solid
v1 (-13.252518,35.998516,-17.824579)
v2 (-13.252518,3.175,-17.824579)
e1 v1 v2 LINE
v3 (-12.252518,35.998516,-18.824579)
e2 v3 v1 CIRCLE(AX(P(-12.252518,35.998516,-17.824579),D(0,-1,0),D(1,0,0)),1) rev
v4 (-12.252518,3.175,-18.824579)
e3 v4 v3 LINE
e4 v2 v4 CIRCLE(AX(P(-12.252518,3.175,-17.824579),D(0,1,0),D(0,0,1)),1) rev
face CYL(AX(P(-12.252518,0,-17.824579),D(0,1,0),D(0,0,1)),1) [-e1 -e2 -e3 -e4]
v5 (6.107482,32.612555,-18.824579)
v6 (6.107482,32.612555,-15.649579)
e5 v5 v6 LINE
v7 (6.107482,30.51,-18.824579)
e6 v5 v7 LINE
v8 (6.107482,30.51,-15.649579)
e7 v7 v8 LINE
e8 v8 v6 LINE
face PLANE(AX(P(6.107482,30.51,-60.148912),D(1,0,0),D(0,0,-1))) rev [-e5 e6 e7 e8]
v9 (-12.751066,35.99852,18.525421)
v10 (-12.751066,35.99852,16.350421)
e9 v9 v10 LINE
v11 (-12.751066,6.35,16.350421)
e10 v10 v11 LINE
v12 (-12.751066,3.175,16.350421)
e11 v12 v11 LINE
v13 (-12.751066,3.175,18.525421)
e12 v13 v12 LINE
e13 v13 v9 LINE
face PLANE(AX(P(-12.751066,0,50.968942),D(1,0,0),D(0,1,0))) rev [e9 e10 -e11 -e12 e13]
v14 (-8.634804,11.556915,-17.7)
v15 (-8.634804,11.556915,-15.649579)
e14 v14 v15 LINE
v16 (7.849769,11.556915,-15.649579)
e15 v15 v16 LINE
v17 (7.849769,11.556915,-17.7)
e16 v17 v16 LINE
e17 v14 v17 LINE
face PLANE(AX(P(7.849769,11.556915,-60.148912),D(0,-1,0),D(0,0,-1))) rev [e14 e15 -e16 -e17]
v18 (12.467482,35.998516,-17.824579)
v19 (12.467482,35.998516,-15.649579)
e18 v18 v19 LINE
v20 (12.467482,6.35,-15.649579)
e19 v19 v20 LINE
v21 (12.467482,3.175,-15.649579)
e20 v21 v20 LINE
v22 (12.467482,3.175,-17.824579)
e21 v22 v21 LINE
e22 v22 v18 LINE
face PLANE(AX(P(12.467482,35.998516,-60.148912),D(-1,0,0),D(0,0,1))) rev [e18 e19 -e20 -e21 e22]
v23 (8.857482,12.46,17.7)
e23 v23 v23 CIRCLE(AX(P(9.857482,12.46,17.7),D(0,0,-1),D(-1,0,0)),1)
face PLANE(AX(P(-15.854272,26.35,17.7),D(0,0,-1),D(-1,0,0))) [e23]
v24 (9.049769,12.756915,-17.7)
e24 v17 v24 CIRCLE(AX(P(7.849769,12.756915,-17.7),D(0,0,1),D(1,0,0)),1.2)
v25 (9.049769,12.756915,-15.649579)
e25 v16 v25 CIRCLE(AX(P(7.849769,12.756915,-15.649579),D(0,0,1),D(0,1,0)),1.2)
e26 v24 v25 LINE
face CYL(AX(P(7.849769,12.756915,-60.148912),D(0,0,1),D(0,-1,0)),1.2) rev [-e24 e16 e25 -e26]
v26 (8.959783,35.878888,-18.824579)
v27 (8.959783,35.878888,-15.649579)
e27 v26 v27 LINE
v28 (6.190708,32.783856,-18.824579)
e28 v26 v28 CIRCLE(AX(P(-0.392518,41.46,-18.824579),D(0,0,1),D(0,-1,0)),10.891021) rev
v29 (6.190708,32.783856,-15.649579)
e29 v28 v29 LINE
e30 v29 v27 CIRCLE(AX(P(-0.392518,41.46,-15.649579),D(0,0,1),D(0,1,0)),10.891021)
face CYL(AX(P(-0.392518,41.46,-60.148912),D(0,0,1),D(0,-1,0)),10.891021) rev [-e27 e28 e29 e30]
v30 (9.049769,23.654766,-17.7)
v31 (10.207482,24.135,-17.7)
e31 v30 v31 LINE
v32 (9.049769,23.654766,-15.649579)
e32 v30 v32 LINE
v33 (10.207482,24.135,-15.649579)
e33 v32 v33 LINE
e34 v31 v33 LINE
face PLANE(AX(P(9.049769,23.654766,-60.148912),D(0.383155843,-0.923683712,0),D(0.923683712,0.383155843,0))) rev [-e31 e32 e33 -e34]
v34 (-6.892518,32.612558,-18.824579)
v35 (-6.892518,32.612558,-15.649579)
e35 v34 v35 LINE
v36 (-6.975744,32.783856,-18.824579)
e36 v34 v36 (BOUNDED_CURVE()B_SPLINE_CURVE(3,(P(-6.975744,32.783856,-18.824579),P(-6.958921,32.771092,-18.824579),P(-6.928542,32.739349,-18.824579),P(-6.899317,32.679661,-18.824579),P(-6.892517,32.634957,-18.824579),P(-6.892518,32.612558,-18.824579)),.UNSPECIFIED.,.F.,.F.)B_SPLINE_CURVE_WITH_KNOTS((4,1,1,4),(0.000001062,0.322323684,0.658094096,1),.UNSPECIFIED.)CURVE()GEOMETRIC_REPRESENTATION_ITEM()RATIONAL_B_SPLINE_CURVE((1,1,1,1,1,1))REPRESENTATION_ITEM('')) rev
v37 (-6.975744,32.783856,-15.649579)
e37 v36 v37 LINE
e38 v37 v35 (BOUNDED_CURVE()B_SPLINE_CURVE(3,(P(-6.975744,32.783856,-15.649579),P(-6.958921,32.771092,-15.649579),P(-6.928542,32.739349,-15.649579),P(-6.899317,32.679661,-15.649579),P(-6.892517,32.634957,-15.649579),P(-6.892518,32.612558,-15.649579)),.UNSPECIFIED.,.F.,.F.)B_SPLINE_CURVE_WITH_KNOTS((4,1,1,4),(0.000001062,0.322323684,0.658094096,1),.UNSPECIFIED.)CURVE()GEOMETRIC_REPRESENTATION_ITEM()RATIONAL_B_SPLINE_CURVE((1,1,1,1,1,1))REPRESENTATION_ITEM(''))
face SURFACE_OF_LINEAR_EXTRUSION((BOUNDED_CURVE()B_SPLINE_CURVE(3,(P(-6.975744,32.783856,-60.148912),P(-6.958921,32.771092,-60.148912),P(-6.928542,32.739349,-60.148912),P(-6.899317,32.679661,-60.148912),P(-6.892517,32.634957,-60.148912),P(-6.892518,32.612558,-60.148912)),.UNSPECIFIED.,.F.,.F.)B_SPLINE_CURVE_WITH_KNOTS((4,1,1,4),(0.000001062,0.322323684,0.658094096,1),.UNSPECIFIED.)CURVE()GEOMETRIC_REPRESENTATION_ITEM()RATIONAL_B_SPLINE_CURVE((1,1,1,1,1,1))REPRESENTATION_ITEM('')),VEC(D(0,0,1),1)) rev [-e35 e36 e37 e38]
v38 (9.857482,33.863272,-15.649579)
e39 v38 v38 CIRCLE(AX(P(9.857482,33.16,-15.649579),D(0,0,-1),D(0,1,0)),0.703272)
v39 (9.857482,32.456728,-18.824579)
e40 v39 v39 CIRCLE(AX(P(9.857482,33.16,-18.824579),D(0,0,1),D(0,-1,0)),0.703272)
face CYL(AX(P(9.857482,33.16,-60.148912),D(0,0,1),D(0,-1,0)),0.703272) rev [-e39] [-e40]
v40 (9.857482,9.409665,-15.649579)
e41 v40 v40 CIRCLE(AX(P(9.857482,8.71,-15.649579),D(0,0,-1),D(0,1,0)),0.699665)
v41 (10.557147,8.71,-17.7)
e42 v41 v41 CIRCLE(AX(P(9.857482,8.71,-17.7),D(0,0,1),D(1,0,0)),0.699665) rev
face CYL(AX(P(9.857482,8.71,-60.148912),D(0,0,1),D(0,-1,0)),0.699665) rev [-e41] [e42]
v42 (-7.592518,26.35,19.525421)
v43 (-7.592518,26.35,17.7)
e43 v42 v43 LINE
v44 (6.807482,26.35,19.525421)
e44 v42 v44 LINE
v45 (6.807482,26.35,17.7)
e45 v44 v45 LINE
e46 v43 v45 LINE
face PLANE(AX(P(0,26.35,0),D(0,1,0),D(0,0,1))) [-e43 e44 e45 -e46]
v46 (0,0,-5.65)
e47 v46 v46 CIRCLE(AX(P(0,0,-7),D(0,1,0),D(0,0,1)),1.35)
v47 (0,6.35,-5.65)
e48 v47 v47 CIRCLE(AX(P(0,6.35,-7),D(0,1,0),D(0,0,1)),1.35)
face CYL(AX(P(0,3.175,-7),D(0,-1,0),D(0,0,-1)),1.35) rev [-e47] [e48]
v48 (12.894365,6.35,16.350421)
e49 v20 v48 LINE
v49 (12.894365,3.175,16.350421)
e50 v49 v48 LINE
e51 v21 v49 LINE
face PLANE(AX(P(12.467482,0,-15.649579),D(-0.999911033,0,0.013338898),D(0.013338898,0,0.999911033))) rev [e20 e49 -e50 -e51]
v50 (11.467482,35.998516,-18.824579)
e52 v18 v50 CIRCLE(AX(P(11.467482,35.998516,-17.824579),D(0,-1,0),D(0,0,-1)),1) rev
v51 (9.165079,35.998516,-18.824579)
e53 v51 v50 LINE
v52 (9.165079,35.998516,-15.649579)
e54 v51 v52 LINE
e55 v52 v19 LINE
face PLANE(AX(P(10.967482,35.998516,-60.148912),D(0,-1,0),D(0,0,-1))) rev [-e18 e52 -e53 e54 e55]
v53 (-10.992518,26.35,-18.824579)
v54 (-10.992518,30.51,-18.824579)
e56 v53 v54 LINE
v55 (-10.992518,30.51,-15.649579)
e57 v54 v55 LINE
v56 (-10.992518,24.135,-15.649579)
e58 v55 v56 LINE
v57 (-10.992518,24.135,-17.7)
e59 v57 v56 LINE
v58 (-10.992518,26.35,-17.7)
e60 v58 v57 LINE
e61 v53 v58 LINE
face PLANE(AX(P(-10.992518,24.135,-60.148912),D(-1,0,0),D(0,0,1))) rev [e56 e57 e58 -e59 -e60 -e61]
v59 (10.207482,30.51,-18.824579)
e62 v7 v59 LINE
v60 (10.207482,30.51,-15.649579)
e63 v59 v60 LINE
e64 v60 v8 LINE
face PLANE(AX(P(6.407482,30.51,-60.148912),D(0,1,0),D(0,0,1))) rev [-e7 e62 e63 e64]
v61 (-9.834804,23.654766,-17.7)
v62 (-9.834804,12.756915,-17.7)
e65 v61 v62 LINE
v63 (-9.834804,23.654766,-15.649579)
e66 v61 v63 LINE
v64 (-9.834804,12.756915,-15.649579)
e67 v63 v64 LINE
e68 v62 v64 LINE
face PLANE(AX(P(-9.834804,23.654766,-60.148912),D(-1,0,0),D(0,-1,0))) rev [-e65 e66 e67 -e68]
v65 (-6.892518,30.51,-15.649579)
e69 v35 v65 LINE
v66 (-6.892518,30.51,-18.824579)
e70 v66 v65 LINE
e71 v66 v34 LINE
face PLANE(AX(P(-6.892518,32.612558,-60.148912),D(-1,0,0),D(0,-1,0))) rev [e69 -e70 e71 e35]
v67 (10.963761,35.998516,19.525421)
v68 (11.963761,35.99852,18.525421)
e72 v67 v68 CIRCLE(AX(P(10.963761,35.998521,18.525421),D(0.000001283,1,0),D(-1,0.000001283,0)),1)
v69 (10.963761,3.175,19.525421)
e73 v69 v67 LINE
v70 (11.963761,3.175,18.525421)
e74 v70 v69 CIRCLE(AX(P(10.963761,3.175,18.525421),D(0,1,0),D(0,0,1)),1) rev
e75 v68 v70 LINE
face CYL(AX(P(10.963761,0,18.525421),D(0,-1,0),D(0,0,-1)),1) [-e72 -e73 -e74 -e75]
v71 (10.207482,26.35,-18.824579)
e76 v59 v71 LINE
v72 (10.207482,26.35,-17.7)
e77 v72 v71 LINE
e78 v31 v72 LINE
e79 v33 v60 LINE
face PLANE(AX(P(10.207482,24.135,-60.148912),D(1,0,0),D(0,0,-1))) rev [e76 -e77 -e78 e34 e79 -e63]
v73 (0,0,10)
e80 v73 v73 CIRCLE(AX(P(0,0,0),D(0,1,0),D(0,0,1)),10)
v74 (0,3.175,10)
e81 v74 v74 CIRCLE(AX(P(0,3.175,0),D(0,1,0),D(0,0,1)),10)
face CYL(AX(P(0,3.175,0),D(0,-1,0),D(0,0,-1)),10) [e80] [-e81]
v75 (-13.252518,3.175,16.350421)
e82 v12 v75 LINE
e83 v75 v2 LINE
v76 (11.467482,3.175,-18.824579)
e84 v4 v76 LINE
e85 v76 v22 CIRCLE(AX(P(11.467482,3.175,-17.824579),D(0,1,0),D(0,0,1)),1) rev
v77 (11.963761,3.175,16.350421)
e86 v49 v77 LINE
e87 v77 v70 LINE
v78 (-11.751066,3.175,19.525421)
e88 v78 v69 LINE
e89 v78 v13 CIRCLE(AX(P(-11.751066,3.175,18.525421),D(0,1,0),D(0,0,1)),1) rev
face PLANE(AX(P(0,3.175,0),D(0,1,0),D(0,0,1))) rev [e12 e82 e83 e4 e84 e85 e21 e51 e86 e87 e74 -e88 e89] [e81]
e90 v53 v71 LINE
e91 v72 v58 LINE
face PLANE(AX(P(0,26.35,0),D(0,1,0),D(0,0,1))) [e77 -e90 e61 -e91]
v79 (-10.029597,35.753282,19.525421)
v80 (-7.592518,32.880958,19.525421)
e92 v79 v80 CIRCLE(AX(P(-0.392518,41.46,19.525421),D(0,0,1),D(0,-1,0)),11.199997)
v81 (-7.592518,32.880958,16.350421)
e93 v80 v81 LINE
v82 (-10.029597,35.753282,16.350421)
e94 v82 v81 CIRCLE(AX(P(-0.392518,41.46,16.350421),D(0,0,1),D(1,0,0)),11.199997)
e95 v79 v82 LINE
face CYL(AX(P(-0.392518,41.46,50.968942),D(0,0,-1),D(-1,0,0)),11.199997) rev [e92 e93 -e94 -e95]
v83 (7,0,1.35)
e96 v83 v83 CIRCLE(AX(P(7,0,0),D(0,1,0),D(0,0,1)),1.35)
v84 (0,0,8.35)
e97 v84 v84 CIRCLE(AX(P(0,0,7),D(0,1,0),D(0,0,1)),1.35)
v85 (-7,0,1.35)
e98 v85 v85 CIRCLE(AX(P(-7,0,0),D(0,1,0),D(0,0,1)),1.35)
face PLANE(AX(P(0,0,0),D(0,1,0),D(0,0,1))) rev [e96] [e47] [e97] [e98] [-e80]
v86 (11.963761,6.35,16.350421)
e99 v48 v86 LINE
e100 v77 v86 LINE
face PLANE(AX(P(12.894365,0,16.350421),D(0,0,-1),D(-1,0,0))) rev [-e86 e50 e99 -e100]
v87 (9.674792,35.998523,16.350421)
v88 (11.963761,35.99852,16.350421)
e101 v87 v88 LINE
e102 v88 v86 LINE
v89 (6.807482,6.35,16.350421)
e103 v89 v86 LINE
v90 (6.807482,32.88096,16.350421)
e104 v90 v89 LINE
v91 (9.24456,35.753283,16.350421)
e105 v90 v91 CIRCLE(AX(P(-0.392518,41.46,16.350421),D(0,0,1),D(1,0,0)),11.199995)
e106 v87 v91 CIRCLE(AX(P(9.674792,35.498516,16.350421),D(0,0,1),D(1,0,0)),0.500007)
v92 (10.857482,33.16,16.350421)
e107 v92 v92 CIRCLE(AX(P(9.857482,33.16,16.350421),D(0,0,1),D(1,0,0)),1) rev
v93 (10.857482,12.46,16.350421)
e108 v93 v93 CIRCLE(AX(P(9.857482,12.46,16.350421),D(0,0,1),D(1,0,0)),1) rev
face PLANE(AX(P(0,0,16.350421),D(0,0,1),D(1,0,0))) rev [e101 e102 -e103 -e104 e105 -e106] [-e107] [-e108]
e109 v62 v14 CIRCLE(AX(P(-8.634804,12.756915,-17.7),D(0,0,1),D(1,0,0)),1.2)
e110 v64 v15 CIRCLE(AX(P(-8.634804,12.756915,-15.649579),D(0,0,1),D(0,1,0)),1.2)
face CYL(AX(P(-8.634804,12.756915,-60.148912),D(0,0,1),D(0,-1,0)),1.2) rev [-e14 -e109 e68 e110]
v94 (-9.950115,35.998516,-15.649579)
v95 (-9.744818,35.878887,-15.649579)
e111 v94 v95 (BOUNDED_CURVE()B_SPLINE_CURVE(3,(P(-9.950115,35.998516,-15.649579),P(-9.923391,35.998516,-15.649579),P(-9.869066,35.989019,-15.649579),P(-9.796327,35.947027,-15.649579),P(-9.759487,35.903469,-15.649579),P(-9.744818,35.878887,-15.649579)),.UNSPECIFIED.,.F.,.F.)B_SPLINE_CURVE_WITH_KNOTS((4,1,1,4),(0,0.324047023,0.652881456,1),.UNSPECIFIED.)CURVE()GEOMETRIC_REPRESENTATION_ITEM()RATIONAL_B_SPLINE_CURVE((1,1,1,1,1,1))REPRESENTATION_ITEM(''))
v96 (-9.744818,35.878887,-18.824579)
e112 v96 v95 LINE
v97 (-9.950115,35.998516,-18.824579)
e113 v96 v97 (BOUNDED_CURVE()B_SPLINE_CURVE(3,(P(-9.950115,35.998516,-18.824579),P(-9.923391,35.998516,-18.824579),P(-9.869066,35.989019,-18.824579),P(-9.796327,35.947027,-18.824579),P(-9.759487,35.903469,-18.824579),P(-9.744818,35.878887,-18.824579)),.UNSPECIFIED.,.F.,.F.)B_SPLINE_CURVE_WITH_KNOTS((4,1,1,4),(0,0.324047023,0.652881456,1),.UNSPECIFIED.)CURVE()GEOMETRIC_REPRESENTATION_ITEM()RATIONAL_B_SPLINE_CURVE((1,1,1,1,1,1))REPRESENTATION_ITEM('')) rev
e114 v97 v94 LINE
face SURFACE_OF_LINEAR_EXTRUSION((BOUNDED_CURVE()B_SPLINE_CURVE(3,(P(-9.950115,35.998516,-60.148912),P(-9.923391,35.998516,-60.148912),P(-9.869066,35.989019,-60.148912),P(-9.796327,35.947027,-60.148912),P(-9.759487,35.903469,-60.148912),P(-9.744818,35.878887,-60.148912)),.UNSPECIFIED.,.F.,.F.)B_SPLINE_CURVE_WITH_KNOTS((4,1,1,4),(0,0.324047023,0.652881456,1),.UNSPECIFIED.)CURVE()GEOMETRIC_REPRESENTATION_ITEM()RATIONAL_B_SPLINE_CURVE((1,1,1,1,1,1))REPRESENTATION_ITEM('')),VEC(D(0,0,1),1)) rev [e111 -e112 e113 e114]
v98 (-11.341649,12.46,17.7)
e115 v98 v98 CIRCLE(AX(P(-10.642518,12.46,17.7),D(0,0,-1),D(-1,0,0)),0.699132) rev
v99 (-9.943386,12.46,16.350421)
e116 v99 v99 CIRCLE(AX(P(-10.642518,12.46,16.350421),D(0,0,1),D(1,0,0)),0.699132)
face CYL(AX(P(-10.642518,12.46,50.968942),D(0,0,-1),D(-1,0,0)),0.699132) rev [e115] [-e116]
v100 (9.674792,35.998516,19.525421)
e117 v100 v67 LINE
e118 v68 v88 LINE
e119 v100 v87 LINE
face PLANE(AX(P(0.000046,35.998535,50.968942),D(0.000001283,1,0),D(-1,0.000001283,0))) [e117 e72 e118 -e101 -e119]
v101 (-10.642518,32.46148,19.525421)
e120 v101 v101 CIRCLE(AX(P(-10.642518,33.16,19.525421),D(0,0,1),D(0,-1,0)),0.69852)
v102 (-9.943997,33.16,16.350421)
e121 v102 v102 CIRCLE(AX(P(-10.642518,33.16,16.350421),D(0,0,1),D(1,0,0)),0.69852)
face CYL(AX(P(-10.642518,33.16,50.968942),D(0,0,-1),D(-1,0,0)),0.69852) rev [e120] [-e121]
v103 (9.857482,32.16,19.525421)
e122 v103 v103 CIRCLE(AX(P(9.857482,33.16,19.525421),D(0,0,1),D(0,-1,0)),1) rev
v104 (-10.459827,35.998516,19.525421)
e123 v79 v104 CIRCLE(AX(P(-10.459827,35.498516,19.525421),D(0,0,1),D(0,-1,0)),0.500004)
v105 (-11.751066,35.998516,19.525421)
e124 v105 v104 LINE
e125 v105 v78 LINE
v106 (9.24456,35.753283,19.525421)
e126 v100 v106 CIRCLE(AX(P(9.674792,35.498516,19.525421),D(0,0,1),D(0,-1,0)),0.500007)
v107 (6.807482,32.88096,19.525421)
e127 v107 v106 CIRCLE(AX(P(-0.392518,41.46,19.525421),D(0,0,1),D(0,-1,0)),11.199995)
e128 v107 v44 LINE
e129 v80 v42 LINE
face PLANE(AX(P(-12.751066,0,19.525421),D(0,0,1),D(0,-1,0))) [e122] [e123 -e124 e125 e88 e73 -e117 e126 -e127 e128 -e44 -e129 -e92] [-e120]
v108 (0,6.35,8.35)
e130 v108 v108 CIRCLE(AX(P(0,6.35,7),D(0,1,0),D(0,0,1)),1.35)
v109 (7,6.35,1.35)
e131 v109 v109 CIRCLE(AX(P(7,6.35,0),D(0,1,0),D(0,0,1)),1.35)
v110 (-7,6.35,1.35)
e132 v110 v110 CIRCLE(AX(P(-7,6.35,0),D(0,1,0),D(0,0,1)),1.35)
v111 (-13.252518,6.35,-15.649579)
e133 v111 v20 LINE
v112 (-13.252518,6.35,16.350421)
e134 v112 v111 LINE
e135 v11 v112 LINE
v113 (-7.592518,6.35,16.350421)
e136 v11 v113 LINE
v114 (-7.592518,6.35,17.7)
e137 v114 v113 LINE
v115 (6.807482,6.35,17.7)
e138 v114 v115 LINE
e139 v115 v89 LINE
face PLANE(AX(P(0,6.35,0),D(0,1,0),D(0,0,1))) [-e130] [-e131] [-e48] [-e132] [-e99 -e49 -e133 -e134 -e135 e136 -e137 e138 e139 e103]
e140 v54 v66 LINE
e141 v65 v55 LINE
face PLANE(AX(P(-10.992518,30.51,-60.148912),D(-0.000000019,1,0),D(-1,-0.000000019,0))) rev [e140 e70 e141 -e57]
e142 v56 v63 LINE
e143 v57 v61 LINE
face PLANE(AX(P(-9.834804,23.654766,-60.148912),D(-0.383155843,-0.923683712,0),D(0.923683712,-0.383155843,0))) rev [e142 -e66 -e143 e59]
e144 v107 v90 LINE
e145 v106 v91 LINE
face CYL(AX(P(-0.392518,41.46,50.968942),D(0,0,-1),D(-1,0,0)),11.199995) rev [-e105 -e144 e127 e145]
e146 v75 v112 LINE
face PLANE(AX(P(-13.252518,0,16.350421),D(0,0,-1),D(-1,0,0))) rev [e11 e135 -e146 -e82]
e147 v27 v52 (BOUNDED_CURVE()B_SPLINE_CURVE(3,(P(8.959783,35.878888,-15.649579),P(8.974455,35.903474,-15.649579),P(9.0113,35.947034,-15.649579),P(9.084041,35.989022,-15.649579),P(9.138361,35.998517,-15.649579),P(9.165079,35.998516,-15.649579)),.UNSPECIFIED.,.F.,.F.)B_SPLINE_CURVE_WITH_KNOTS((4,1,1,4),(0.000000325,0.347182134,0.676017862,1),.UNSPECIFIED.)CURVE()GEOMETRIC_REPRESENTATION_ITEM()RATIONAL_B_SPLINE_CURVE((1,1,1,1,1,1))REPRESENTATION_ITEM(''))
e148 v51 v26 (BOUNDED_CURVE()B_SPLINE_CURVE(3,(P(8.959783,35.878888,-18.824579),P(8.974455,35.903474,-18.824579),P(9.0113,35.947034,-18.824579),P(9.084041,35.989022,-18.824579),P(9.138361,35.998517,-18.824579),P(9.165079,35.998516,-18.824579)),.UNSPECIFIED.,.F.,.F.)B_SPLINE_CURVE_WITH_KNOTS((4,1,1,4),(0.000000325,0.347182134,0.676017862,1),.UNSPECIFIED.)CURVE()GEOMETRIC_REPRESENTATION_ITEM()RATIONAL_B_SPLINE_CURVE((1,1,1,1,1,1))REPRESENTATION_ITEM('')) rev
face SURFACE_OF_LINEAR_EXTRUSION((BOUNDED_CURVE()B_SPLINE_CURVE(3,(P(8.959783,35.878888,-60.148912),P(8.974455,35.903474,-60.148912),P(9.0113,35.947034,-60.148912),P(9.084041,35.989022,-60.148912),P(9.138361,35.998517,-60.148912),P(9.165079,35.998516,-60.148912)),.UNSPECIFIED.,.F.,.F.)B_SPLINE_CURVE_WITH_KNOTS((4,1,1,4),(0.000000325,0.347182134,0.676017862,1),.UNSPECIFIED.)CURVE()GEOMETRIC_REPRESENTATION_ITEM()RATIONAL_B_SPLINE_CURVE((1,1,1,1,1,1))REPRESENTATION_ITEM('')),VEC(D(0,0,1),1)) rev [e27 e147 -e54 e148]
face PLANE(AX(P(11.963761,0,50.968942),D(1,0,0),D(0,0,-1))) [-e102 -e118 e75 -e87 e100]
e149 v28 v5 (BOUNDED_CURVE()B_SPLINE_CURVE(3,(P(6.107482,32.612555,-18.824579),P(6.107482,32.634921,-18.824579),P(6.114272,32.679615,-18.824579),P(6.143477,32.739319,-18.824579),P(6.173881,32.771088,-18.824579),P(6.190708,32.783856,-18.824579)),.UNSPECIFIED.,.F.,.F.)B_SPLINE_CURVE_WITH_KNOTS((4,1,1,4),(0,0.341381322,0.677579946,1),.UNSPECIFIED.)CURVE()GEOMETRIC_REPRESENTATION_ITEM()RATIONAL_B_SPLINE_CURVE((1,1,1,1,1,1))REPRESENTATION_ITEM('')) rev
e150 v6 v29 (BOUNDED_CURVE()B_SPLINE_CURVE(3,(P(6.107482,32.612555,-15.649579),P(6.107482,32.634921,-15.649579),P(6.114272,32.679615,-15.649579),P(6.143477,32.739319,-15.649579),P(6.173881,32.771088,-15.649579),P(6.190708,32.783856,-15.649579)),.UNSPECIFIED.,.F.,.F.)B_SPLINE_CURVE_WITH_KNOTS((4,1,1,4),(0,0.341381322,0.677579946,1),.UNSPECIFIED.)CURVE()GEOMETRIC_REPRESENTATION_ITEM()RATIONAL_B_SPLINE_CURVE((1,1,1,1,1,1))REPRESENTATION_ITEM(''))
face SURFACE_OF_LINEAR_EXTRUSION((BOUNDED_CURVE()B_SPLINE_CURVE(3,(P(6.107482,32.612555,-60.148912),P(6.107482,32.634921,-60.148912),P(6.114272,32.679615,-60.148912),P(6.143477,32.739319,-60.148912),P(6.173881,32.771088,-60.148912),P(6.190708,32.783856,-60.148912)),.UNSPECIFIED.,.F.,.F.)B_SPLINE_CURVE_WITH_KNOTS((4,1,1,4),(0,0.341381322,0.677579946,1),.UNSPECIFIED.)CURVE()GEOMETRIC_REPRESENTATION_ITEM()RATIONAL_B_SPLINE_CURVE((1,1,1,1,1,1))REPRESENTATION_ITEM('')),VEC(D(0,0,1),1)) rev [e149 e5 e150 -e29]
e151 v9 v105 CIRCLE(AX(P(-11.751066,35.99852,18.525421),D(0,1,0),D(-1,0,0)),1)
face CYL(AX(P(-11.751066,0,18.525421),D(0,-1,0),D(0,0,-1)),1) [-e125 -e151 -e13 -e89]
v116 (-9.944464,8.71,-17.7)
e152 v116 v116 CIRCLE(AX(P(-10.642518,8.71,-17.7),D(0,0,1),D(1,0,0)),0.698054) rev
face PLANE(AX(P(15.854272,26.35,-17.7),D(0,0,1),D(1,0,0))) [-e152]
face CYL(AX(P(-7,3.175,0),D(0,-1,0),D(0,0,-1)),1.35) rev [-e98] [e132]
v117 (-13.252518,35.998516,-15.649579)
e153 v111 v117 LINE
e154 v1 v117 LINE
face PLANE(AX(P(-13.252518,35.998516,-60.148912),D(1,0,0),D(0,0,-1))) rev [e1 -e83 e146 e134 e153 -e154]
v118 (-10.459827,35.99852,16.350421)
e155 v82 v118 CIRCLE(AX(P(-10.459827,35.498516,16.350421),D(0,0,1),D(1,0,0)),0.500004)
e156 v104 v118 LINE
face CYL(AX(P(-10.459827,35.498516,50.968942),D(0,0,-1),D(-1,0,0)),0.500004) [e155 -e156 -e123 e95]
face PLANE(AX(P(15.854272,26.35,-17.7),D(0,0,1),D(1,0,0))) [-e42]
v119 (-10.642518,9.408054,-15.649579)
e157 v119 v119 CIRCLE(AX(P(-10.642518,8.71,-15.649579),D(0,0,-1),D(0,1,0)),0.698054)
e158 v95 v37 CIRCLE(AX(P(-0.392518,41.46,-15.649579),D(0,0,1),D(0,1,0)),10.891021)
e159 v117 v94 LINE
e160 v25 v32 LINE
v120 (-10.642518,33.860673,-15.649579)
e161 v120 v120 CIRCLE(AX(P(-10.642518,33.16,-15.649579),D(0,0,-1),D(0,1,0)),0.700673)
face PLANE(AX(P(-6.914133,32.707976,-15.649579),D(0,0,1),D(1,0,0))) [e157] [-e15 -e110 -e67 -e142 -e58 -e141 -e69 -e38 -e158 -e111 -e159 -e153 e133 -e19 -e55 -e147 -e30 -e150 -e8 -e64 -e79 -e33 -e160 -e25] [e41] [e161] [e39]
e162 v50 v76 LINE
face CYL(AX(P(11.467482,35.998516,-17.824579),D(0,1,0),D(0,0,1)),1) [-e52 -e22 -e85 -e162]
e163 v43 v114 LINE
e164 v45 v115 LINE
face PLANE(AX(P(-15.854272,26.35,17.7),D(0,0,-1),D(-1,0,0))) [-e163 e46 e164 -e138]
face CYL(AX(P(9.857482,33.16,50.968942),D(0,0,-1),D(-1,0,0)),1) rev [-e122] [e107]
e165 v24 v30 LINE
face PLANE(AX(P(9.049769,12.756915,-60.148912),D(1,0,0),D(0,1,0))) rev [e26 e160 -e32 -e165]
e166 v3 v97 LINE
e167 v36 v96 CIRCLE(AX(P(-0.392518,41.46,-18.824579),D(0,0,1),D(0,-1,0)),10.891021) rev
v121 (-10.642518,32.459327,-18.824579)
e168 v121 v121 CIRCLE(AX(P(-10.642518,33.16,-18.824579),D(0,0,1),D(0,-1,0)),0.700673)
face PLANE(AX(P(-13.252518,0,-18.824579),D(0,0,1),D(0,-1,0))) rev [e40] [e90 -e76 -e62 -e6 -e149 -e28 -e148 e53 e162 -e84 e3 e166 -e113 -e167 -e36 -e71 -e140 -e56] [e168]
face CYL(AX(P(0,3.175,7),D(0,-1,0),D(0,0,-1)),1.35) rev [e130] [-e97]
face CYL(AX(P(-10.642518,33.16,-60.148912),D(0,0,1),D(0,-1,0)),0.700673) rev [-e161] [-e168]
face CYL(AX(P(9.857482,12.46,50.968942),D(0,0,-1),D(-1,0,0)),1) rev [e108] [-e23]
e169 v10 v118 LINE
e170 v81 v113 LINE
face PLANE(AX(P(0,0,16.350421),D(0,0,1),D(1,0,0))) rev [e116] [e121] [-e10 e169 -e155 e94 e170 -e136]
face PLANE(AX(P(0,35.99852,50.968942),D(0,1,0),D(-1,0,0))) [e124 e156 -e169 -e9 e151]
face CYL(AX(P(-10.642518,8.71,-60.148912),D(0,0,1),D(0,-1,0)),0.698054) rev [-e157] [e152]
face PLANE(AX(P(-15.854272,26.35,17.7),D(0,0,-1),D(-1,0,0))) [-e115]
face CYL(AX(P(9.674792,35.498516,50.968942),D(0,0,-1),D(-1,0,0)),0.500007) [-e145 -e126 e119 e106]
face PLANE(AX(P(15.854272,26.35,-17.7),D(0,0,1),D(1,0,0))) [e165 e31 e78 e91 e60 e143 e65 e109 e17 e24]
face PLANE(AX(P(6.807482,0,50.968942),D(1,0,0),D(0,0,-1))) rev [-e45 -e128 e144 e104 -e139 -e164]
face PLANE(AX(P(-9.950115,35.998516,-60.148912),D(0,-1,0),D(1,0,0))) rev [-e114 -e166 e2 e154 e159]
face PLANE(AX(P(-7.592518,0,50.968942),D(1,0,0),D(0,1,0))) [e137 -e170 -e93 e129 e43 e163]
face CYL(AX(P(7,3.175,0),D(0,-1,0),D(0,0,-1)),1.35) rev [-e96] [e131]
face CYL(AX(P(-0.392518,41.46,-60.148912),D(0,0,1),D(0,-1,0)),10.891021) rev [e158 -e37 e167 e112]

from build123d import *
from OCP.BRepAlgoAPI import BRepAlgoAPI_Cut
from OCP.TopTools import TopTools_ListOfShape

# Parameters (mm, degrees)
SKETCH1_R                 = 10
SKETCH1_R_2               = 1.35
BOSS_EXTRUDE1_DEPTH       = 3.175
SKETCH2_W                 = 38.058543228
SKETCH2_H                 = 41.75
SKETCH2_R                 = 1.35
BOSS_EXTRUDE2_DEPTH       = 3.175
SKETCH3_W                 = 38.058543228
SKETCH3_H                 = 41.75
SKETCH3_W_2               = 31.708543228
SKETCH3_H_2               = 35.4
BOSS_EXTRUDE3_DEPTH       = 20
FILLET1_R                 = 5
BOSS_EXTRUDE4_OUTLINE_R   = 1
BOSS_EXTRUDE4_OUTLINE_R_2 = 0.698520241
BOSS_EXTRUDE4_OUTLINE_R_3 = 0.699131638
BOSS_EXTRUDE4_DEPTH       = 4.524579022
SKETCH6_R                 = 0.699665004
SKETCH6_R_2               = 0.703272365
SKETCH6_R_3               = 0.700673295
SKETCH6_R_4               = 0.698053945
BOSS_EXTRUDE5_DEPTH       = 5.225420978
CUT_EXTRUDE3_DEPTH        = 39.629021569
CUT_EXTRUDE4_DEPTH        = 44.672508997
FILLET2_R                 = 1


with BuildPart() as part:
    # Sketch1 → Boss-Extrude1 (new body)
    with BuildSketch(Plane(origin=(0, 0, 0), x_dir=(1, 0, 0), z_dir=(0, 1, 0))):
        with Locations(Location((0, 0, 0), (0, 0, 270))):
            Circle(SKETCH1_R)
        with Locations(Location((0, 7, 0), (0, 0, 270))):
            Circle(SKETCH1_R_2, mode=Mode.SUBTRACT)
        with Locations(Location((7, 0, 0), (0, 0, 270))):
            Circle(SKETCH1_R_2, mode=Mode.SUBTRACT)
        with Locations(Location((0, -7, 0), (0, 0, 270))):
            Circle(SKETCH1_R_2, mode=Mode.SUBTRACT)
        with Locations(Location((-7, 0, 0), (0, 0, 270))):
            Circle(SKETCH1_R_2, mode=Mode.SUBTRACT)
    extrude(amount=BOSS_EXTRUDE1_DEPTH)

    # Sketch2 → Boss-Extrude2 (add)
    with BuildSketch(Plane(origin=(0, 3.175, 0), x_dir=(1, 0, 0), z_dir=(0, 1, 0))):
        Rectangle(SKETCH2_W, SKETCH2_H)
        with Locations(Location((0, -7, 0), (0, 0, 270))):
            Circle(SKETCH2_R, mode=Mode.SUBTRACT)
        with Locations(Location((7, 0, 0), (0, 0, 270))):
            Circle(SKETCH2_R, mode=Mode.SUBTRACT)
        with Locations(Location((-7, 0, 0), (0, 0, 270))):
            Circle(SKETCH2_R, mode=Mode.SUBTRACT)
        with Locations(Location((0, 7, 0), (0, 0, 270))):
            Circle(SKETCH2_R, mode=Mode.SUBTRACT)
    extrude(amount=BOSS_EXTRUDE2_DEPTH)

    # Sketch3 → Boss-Extrude3 (add)
    with BuildSketch(Plane(origin=(0, 6.35, 0), x_dir=(1, 0, 0), z_dir=(0, 1, 0))):
        Rectangle(SKETCH3_W, SKETCH3_H)
        Rectangle(SKETCH3_W_2, SKETCH3_H_2, mode=Mode.SUBTRACT)
    extrude(amount=BOSS_EXTRUDE3_DEPTH)

    # Fillet1
    fillet1_edges = [part.edges().sort_by_distance(p)[0] for p in [
        (-19.029271614, 14.7625, -20.875),
        (-19.029271614, 14.7625, 20.875),
        (19.029271614, 14.7625, 20.875),
        (19.029271614, 14.7625, -20.875),
    ]]
    fillet(fillet1_edges, radius=FILLET1_R)

    # Boss-Extrude4: read off the stored shape, not the designer's step
    # Boss-Extrude4 outline → Boss-Extrude4 (add)
    # profile 1 of 2: a face of its own
    with BuildSketch(Plane.XY.offset(16.350420978)):
        with BuildLine():
            ThreePointArc((9.674791631, 35.998523082), (9.427181956, 35.932908065), (9.244559074, 35.753284112))
            ThreePointArc((9.244559074, 35.753284112), (8.147643376, 34.213929311), (6.807481387, 32.880961337))
            Line((6.807481387, 32.880961337), (6.807482447, 6.35))
            Line((6.807482447, 6.35), (11.963760646, 6.35))
            Line((11.963760646, 6.35), (11.963760646, 35.998520144))
            Line((11.963760646, 35.998520144), (9.674791631, 35.998523082))
        make_face()
        with Locations((9.857482447, 33.16)):
            Circle(BOSS_EXTRUDE4_OUTLINE_R, mode=Mode.SUBTRACT)
        with Locations((9.857482447, 12.46)):
            Circle(BOSS_EXTRUDE4_OUTLINE_R, mode=Mode.SUBTRACT)
    # profile 2 of 2: a face of its own
    with BuildSketch(Plane.XY.offset(16.350420978)):
        with BuildLine():
            Line((-12.751066043, 35.998520144), (-12.751066043, 6.35))
            Line((-12.751066043, 6.35), (-7.592517553, 6.35))
            Line((-7.592517553, 6.35), (-7.592516964, 32.880958857))
            ThreePointArc((-7.592516964, 32.880958857), (-8.932679762, 34.213927416), (-10.029597495, 35.753282149))
            ThreePointArc((-10.029597495, 35.753282149), (-10.212218516, 35.932905514), (-10.459826737, 35.998520144))
            Line((-10.459826737, 35.998520144), (-12.751066043, 35.998520144))
        make_face()
        with Locations((-10.642517553, 33.16)):
            Circle(BOSS_EXTRUDE4_OUTLINE_R_2, mode=Mode.SUBTRACT)
        with Locations((-10.642517553, 12.46)):
            Circle(BOSS_EXTRUDE4_OUTLINE_R_3, mode=Mode.SUBTRACT)
    extrude(amount=BOSS_EXTRUDE4_DEPTH)

    # Sketch6 → Boss-Extrude5 (add)
    with BuildSketch(Plane(origin=(0, 0, -15.649579022), x_dir=(-1, 0, 0), z_dir=(0, 0, -1))):
        with BuildLine():
            Line((10.992517553, 24.135), (10.992517553, 30.51))
            Line((10.992517553, 30.51), (7.192517366, 30.510000072))
            Line((7.192517366, 30.510000072), (6.892517553, 30.510000072))
            Line((6.892517553, 30.510000072), (6.892517553, 32.612557612))
            add(Edge.make_bspline(
                [(6.975743415, 32.783855976), (6.958921233, 32.771091761), (6.928542383, 32.73934935), (6.899316538, 32.679660552), (6.892517469, 32.634957243), (6.892517553, 32.612557612)],
                knots=[1.062e-06, 1.062e-06, 1.062e-06, 1.062e-06, 0.322323684, 0.658094096, 1, 1, 1, 1], degree=3, weights=[1, 1, 1, 1, 1, 1]))
            ThreePointArc((6.975743415, 32.783855976), (8.509170356, 34.198162413), (9.744817778, 35.878887355))
            add(Edge.make_bspline(
                [(9.950114528, 35.998516481), (9.923391157, 35.998516414), (9.869066225, 35.989019468), (9.796326784, 35.947026629), (9.759487209, 35.903468994), (9.744817778, 35.878887355)],
                knots=[0, 0, 0, 0, 0.324047023, 0.652881456, 1, 1, 1, 1], degree=3, weights=[1, 1, 1, 1, 1, 1]))
            Line((9.950114528, 35.998516481), (11.752517552, 35.998516481))
            Line((11.752517552, 35.998516481), (13.252517552, 35.998516481))
            Line((13.252517552, 35.998516481), (13.252517552, 6.318190736))
            Line((13.252517552, 6.318190736), (-12.46748245, 6.318190736))
            Line((-12.46748245, 6.318190736), (-12.46748245, 35.998516481))
            Line((-12.46748245, 35.998516481), (-10.96748245, 35.998516481))
            Line((-10.96748245, 35.998516481), (-9.165078771, 35.998516481))
            add(Edge.make_bspline(
                [(-8.959782959, 35.878887832), (-8.974454973, 35.903473814), (-9.011299786, 35.947034481), (-9.084041461, 35.989022268), (-9.138360889, 35.998516579), (-9.165078771, 35.998516481)],
                knots=[3.25e-07, 3.25e-07, 3.25e-07, 3.25e-07, 0.347182134, 0.676017862, 1, 1, 1, 1], degree=3, weights=[1, 1, 1, 1, 1, 1]))
            ThreePointArc((-8.959782959, 35.878887832), (-7.72413548, 34.198162669), (-6.190708414, 32.783856055))
            add(Edge.make_bspline(
                [(-6.107482447, 32.612555023), (-6.107481996, 32.634920643), (-6.114271613, 32.679614721), (-6.143476784, 32.739319032), (-6.173880837, 32.77108775), (-6.190708414, 32.783856055)],
                knots=[0, 0, 0, 0, 0.341381322, 0.677579946, 1, 1, 1, 1], degree=3, weights=[1, 1, 1, 1, 1, 1]))
            Line((-6.107482447, 32.612555023), (-6.107482447, 30.510000072))
            Line((-6.107482447, 30.510000072), (-6.407482262, 30.510000072))
            Line((-6.407482262, 30.510000072), (-10.207482447, 30.51))
            Line((-10.207482447, 30.51), (-10.207482447, 24.135))
            Line((-10.207482447, 24.135), (-9.049769141, 23.654765682))
            Line((-9.049769141, 23.654765682), (-9.049769141, 12.756914674))
            ThreePointArc((-9.049769141, 12.756914674), (-8.698297278, 11.908386539), (-7.849769141, 11.556914678))
            Line((-7.849769141, 11.556914678), (8.634804248, 11.556914678))
            ThreePointArc((8.634804248, 11.556914678), (9.483332385, 11.908386541), (9.834804247, 12.756914678))
            Line((9.834804247, 12.756914678), (9.834804247, 23.654765682))
            Line((9.834804247, 23.654765682), (10.992517553, 24.135))
        make_face()
        with Locations(Location((-9.857482447, 8.71, 0), (0, 0, 180))):
            Circle(SKETCH6_R, mode=Mode.SUBTRACT)
        with Locations(Location((-9.857482447, 33.16, 0), (0, 0, 180))):
            Circle(SKETCH6_R_2, mode=Mode.SUBTRACT)
        with Locations(Location((10.642517553, 33.16, 0), (0, 0, 180))):
            Circle(SKETCH6_R_3, mode=Mode.SUBTRACT)
        with Locations(Location((10.642517553, 8.71, 0), (0, 0, 180))):
            Circle(SKETCH6_R_4, mode=Mode.SUBTRACT)
    extrude(amount=BOSS_EXTRUDE5_DEPTH)

    # Sketch7 → Cut-Extrude3 (cut, through all)
    with BuildSketch(Plane(origin=(0, 26.35, 0), x_dir=(1, 0, 0), z_dir=(0, 1, 0))):
        Polygon((11.963760646, -16.350420978), (11.963760646, -22.528007323), (30.022930958, -23.761888284), (27.696884363, 28.84716935), (12.46748245, 20.875), (12.46748245, 15.649579022), (12.894365171, -16.350420978), align=None)
        Polygon((-12.751066043, -16.350420978), (-12.751066043, -23.761888284), (-21.517724294, -22.528007323), (-21.901635858, 22.206155736), (-13.252517552, 20.875), (-13.252517552, -16.350420978), align=None)
    extrude(amount=-CUT_EXTRUDE3_DEPTH, mode=Mode.SUBTRACT)


with BuildPart() as cut_extrude4_tool:
    # Sketch9 → Cut-Extrude4 (new, through all)
    with BuildSketch(Plane(origin=(-2e-09, 35.998516482, 0), x_dir=(1.0, 6.10309035182258e-11, 0), z_dir=(-6.10309035182258e-11, 1.0, -1.0368003232160358e-14))):
        Polygon((-12.751066041, -19.525420978), (13.891993445, -19.525420978), (13.555046053, -22.524424576), (-19.185008861, -22.524424576), align=None)
        Polygon((-13.25251755, 18.824579022), (15.127467216, 18.824579022), (13.105782864, 23.749676422), (-20.139693138, 23.131939537), align=None)
    extrude(amount=-CUT_EXTRUDE4_DEPTH)


with BuildPart() as part_1:
    add(part.part)

    # Cut-Extrude4: cut by cut_extrude4_tool, with a tolerance
    cut_extrude4_stock = TopTools_ListOfShape()
    cut_extrude4_stock.Append(part_1.part.wrapped)
    cut_extrude4_tools = TopTools_ListOfShape()
    cut_extrude4_tools.Append(cut_extrude4_tool.part.wrapped)
    cut_extrude4_cut = BRepAlgoAPI_Cut()
    cut_extrude4_cut.SetArguments(cut_extrude4_stock)
    cut_extrude4_cut.SetTools(cut_extrude4_tools)
    cut_extrude4_cut.SetFuzzyValue(0.00001)
    cut_extrude4_cut.Build()
    add(Compound.cast(cut_extrude4_cut.Shape()).solids(), mode=Mode.REPLACE)

    # Fillet2
    fillet2_edges = [part_1.edges().sort_by_distance(p)[0] for p in [
        (12.46748245, 19.58675824, -18.824579022),
        (-13.252517551, 19.58675824, -18.824579022),
        (-12.751066042, 19.58675824, 19.525420978),
        (11.963760646, 19.586758241, 19.525420978),
    ]]
    fillet(fillet2_edges, radius=FILLET2_R)


solid = part_1.part
